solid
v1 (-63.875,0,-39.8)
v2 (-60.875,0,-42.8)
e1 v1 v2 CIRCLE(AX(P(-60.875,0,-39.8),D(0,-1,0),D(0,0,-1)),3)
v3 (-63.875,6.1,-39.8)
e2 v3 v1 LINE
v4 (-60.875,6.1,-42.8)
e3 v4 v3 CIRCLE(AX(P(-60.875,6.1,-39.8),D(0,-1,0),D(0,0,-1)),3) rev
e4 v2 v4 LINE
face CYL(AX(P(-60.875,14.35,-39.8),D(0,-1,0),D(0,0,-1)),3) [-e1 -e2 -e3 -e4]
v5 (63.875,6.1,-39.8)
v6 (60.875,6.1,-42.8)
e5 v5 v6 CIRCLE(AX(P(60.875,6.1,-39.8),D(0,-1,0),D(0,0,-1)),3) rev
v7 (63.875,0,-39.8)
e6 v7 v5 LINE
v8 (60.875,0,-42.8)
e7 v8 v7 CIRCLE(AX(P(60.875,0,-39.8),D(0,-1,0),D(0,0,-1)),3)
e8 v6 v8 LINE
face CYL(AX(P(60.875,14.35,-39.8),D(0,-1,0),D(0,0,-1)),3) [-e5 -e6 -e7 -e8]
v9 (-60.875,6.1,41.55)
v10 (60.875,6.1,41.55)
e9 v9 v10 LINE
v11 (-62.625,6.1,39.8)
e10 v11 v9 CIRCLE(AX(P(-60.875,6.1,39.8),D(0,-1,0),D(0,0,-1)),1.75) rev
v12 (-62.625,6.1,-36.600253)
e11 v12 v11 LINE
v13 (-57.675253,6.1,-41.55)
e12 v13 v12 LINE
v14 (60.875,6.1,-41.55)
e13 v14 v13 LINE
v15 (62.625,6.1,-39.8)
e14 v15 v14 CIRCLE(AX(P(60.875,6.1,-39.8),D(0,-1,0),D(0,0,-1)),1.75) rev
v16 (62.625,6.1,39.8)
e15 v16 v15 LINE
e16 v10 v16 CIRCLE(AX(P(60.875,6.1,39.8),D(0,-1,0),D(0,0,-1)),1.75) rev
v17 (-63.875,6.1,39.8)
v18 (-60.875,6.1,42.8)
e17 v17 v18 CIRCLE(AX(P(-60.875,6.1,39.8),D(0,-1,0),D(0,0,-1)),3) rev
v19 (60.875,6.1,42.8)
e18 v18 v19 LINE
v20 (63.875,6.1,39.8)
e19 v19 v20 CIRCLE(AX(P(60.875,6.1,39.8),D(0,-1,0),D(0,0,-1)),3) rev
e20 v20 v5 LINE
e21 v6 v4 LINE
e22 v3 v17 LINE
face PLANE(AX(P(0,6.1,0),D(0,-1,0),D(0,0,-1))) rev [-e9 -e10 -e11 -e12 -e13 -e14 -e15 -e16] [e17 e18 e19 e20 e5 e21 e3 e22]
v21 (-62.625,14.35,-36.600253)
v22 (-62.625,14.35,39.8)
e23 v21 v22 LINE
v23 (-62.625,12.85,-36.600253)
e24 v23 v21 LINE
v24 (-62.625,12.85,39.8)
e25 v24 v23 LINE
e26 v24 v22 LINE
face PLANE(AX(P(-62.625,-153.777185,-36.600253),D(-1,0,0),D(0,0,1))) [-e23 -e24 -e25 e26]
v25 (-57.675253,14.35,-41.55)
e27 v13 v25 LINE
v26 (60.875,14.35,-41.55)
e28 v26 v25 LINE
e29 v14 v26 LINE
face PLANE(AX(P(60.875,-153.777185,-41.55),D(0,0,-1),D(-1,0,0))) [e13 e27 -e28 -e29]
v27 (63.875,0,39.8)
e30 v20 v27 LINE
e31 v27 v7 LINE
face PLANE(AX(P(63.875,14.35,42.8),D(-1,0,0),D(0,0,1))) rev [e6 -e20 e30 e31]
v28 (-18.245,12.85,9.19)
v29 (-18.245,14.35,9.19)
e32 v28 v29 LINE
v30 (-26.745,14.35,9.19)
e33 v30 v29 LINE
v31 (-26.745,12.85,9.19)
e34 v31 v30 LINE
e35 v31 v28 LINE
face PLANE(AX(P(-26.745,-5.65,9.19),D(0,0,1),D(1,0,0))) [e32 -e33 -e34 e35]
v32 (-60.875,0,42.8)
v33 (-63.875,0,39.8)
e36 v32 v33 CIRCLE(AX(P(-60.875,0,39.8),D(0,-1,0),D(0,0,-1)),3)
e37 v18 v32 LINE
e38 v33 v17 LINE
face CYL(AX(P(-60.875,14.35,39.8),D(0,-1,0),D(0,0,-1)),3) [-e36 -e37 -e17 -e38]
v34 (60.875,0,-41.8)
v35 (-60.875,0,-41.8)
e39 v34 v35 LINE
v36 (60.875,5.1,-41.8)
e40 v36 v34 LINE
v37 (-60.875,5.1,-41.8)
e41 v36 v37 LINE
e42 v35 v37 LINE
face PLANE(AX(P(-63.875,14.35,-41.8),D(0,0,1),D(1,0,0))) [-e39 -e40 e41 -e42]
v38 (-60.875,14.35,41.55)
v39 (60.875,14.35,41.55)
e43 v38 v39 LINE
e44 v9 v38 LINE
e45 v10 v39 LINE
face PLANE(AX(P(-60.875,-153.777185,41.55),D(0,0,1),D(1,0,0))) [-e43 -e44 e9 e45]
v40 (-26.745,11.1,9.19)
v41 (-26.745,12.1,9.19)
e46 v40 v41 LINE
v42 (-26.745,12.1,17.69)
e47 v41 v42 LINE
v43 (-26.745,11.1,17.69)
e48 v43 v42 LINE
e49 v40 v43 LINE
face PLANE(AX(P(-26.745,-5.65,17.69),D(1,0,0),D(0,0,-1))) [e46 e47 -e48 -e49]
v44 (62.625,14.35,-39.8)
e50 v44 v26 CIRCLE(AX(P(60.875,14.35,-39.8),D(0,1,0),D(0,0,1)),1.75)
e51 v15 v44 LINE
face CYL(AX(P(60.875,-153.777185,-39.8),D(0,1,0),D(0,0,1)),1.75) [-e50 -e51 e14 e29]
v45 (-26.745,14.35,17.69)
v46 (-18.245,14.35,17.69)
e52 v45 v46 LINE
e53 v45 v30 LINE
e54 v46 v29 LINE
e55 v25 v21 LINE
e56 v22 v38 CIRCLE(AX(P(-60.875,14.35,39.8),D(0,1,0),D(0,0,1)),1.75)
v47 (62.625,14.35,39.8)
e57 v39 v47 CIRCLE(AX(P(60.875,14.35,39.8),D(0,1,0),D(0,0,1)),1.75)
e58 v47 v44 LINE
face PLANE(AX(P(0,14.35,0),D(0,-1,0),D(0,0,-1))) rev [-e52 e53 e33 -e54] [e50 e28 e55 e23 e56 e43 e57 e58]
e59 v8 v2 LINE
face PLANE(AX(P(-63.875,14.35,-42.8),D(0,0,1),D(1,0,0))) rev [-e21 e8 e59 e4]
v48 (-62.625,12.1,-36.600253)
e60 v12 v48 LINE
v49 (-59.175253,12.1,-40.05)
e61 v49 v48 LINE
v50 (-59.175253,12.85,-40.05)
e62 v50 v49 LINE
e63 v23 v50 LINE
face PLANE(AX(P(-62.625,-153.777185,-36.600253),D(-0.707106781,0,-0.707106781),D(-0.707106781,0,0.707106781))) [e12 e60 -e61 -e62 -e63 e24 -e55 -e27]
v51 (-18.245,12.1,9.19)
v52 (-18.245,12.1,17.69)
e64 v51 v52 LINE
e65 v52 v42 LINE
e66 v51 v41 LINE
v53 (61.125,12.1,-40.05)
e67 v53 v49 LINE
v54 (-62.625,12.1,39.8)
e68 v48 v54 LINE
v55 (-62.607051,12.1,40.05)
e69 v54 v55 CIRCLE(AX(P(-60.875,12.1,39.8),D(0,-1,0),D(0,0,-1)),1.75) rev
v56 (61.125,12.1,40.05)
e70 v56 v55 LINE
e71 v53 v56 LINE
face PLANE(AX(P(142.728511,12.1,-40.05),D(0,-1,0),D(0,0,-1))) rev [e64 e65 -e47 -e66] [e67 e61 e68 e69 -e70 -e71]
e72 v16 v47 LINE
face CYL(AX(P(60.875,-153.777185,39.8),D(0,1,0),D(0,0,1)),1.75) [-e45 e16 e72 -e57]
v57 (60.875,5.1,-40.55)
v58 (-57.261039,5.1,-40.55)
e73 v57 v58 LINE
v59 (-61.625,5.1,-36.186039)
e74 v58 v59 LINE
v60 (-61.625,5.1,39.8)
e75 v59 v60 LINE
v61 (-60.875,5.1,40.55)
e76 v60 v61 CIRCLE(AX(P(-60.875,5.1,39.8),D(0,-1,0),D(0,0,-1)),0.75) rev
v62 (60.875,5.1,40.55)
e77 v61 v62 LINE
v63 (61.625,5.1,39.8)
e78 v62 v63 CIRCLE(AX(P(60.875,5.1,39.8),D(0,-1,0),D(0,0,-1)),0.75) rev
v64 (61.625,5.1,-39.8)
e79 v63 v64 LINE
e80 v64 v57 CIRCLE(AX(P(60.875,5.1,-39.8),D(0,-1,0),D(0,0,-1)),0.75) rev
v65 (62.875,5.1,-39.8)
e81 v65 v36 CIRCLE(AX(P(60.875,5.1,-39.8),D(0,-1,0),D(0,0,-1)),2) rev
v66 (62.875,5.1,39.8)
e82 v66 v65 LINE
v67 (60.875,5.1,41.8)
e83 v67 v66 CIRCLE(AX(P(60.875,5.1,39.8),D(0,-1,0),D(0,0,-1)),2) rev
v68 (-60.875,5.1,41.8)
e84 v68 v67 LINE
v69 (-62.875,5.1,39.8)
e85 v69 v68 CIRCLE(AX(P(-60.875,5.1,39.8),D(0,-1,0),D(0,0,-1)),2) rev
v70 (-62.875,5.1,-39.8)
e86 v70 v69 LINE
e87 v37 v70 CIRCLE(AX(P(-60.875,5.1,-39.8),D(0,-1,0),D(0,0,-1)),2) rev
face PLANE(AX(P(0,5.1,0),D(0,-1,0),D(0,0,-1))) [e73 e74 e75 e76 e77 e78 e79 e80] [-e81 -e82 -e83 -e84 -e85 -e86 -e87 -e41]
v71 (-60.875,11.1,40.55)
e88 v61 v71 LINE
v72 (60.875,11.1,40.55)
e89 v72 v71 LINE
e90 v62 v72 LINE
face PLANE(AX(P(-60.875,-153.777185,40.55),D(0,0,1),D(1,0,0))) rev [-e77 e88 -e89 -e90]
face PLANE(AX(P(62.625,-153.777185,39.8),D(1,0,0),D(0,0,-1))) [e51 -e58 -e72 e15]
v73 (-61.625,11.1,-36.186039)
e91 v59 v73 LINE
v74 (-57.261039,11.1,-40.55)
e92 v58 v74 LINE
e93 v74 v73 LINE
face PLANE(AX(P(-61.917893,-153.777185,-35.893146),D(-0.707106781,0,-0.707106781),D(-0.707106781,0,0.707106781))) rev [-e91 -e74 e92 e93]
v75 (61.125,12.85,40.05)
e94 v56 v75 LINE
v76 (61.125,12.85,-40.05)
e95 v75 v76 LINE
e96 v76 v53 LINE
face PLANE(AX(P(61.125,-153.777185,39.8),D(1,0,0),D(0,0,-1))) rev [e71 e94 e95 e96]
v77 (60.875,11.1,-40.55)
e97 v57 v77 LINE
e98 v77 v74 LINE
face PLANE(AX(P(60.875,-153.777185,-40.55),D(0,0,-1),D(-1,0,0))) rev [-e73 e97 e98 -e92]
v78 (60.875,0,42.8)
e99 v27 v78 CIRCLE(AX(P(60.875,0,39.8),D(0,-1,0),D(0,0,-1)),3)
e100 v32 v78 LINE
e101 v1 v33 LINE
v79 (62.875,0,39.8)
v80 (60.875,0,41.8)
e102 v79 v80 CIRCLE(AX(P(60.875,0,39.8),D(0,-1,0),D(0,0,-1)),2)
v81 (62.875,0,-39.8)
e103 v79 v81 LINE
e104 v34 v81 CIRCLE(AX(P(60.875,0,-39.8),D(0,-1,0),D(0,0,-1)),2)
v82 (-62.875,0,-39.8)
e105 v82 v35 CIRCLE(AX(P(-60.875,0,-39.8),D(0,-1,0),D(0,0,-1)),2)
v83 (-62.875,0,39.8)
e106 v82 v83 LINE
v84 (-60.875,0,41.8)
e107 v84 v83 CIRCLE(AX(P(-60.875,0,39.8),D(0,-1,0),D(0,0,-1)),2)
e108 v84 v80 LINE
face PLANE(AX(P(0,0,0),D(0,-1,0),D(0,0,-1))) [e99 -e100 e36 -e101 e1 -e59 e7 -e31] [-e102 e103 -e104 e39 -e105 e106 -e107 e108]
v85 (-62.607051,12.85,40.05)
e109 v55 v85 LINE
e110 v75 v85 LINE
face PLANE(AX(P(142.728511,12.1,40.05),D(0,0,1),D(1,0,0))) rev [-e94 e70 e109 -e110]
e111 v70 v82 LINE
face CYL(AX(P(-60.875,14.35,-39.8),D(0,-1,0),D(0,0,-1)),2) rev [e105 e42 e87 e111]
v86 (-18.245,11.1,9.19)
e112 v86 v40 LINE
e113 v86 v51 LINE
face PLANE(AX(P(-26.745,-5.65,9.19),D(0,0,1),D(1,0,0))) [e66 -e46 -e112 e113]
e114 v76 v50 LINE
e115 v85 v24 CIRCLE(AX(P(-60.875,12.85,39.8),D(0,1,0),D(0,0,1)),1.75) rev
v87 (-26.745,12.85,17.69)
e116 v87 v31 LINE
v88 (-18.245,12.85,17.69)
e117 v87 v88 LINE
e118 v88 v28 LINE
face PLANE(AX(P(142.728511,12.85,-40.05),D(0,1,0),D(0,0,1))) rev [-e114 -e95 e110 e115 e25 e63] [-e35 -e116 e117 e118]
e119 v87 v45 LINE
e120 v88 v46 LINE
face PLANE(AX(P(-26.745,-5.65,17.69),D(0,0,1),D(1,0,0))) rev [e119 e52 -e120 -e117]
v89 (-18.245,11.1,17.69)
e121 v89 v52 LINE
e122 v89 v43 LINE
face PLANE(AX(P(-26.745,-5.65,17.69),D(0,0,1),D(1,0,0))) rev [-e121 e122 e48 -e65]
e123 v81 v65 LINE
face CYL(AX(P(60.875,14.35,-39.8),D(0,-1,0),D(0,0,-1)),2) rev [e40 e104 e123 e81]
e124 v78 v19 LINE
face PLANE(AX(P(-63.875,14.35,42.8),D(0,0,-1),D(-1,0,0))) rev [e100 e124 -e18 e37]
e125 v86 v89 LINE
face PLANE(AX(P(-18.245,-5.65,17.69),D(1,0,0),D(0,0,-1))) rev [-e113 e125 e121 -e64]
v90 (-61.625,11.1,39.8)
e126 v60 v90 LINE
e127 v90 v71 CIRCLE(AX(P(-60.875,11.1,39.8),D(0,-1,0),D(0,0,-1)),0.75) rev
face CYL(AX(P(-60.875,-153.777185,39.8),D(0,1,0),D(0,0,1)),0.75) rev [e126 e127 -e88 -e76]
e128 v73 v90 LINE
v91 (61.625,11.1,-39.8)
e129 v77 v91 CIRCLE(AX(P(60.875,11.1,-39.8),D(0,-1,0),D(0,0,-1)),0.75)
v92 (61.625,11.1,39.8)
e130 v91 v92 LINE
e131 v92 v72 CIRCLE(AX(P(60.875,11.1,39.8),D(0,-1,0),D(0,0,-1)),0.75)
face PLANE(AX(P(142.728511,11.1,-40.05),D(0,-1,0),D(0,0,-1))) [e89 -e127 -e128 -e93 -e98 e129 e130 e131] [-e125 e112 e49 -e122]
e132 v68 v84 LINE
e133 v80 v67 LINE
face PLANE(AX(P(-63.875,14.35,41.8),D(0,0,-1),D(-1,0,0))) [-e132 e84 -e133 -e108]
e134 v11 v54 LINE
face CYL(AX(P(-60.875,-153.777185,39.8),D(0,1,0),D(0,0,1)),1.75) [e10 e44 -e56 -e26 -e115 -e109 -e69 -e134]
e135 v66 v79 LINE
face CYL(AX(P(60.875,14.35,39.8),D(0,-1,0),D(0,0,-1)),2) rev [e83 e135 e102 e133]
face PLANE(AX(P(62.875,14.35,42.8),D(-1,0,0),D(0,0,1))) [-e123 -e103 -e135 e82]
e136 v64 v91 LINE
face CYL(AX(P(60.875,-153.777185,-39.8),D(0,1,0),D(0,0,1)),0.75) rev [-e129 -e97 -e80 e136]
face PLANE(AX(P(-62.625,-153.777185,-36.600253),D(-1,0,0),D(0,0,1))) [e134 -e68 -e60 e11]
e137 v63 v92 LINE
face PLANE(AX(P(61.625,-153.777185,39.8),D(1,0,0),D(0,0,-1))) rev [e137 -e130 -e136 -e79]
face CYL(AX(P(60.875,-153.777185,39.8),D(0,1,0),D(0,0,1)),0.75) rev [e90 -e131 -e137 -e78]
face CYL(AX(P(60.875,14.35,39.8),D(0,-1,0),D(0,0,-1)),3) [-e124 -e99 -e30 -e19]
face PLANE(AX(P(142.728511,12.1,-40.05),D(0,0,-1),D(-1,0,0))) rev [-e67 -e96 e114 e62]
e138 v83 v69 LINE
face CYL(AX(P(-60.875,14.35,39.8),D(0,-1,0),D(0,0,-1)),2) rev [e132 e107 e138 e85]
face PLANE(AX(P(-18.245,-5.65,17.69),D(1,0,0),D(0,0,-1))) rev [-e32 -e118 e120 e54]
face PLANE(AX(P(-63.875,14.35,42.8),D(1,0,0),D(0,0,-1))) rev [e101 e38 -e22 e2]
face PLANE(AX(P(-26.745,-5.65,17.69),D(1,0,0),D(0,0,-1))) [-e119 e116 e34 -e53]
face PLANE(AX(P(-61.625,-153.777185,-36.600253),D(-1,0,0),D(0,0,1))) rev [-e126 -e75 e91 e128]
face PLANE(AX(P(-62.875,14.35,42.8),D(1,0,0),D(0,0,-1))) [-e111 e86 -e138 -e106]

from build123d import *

# Parameters (mm, degrees)
SKETCH1_W           = 127.75
SKETCH1_H           = 85.6
BOSS_EXTRUDE1_DEPTH = 14.35
FILLET1_R           = 3
CUT_FLANGE_DEPTH    = 8.25
SKETCH5_W           = 80.1
SKETCH5_H           = 0.75
CUT_PAPERSLOT_DEPTH = 123.75
SHELL1_DEPTH        = 11.1
SHELL1_2_DEPTH      = 5.1
SKETCH4_W           = 8.5
SKETCH4_H           = 8.5
CUT_EXTRUDE3_DEPTH  = 20


# Read off the part's stored shape, not the designer's step: Shell1
with BuildPart() as part:
    # Sketch1 → Boss-Extrude1 (new body)
    with BuildSketch(Plane(origin=(0, 0, 0), x_dir=(1, 0, 0), z_dir=(0, 1, 0))):
        Rectangle(SKETCH1_W, SKETCH1_H)
    extrude(amount=BOSS_EXTRUDE1_DEPTH)

    # Fillet1
    fillet1_edges = [part.edges().sort_by_distance(p)[0] for p in [
        (-63.875, 7.175, -42.8),
        (63.875, 7.175, -42.8),
        (63.875, 7.175, 42.8),
        (-63.875, 7.175, 42.8),
    ]]
    fillet(fillet1_edges, radius=FILLET1_R)

    # Sketch3 → Cut-Flange (cut)
    with BuildSketch(Plane(origin=(0, 14.35, 0), x_dir=(1, 0, 0), z_dir=(0, 1, 0))):
        with BuildLine():
            Line((-63.875, 39.8), (-63.875, -39.8))
            ThreePointArc((-63.875, -39.8), (-62.996320344, -41.921320344), (-60.875, -42.8))
            Line((-60.875, -42.8), (60.875, -42.8))
            ThreePointArc((60.875, -42.8), (62.996320344, -41.921320344), (63.875, -39.8))
            Line((63.875, -39.8), (63.875, 39.8))
            ThreePointArc((63.875, 39.8), (62.996320344, 41.921320344), (60.875, 42.8))
            Line((60.875, 42.8), (-60.875, 42.8))
            ThreePointArc((-60.875, 42.8), (-62.996320344, 41.921320344), (-63.875, 39.8))
        make_face()
        with BuildLine():
            Line((-62.625, 36.600252532), (-62.625, -39.8))
            ThreePointArc((-62.625, -39.8), (-62.112436867, -41.037436867), (-60.875, -41.55))
            Line((-60.875, -41.55), (60.875, -41.55))
            ThreePointArc((60.875, -41.55), (62.112436867, -41.037436867), (62.625, -39.8))
            Line((62.625, -39.8), (62.625, 39.8))
            ThreePointArc((62.625, 39.8), (62.112436867, 41.037436867), (60.875, 41.55))
            Line((60.875, 41.55), (-57.675252532, 41.55))
            Line((-57.675252532, 41.55), (-62.625, 36.600252532))
        make_face(mode=Mode.SUBTRACT)
    extrude(amount=-CUT_FLANGE_DEPTH, mode=Mode.SUBTRACT)

    # Sketch5 → Cut-PaperSlot (cut)
    with BuildSketch(Plane.ZY.offset(62.625)):
        with Locations((0, 12.475)):
            Rectangle(SKETCH5_W, SKETCH5_H)
    extrude(amount=-CUT_PAPERSLOT_DEPTH, mode=Mode.SUBTRACT)

    # Shell1 outline → Shell1 (cut)
    with BuildSketch(Plane(origin=(0, 0, 0), x_dir=(1, 0, 0), z_dir=(0, 1, 0))):
        with BuildLine():
            Line((-61.625, 36.186038969), (-61.625, -39.8))
            ThreePointArc((-61.625, -39.8), (-61.405330086, -40.330330086), (-60.875, -40.55))
            Line((-60.875, -40.55), (60.875, -40.55))
            ThreePointArc((60.875, -40.55), (61.405330086, -40.330330086), (61.625, -39.8))
            Line((61.625, -39.8), (61.625, 39.8))
            ThreePointArc((61.625, 39.8), (61.405330086, 40.330330086), (60.875, 40.55))
            Line((60.875, 40.55), (-57.261038969, 40.55))
            Line((-57.261038969, 40.55), (-61.625, 36.186038969))
        make_face()
    extrude(amount=SHELL1_DEPTH, mode=Mode.SUBTRACT)

    # Shell1 2 outline → Shell1 2 (cut)
    with BuildSketch(Plane(origin=(0, 0, 0), x_dir=(1, 0, 0), z_dir=(0, 1, 0))):
        with BuildLine():
            Line((-62.875, 39.8), (-62.875, -39.8))
            ThreePointArc((-62.875, -39.8), (-62.289213562, -41.214213562), (-60.875, -41.8))
            Line((-60.875, -41.8), (60.875, -41.8))
            ThreePointArc((60.875, -41.8), (62.289213562, -41.214213562), (62.875, -39.8))
            Line((62.875, -39.8), (62.875, 39.8))
            ThreePointArc((62.875, 39.8), (62.289213562, 41.214213562), (60.875, 41.8))
            Line((60.875, 41.8), (-60.875, 41.8))
            ThreePointArc((-60.875, 41.8), (-62.289213562, 41.214213562), (-62.875, 39.8))
        make_face()
        with BuildLine():
            ThreePointArc((-60.875, -40.55), (-61.405330086, -40.330330086), (-61.625, -39.8))
            Line((-61.625, -39.8), (-61.625, 36.186038969))
            Line((-61.625, 36.186038969), (-57.261038969, 40.55))
            Line((-57.261038969, 40.55), (60.875, 40.55))
            ThreePointArc((60.875, 40.55), (61.405330086, 40.330330086), (61.625, 39.8))
            Line((61.625, 39.8), (61.625, -39.8))
            ThreePointArc((61.625, -39.8), (61.405330086, -40.330330086), (60.875, -40.55))
            Line((60.875, -40.55), (-60.875, -40.55))
        make_face(mode=Mode.SUBTRACT)
    extrude(amount=SHELL1_2_DEPTH, mode=Mode.SUBTRACT)

    # Sketch4 → Cut-Extrude3 (cut)
    with BuildSketch(Plane(origin=(0, 14.35, 0), x_dir=(1, 0, 0), z_dir=(0, 1, 0))):
        with Locations((-22.495, -13.44)):
            Rectangle(SKETCH4_W, SKETCH4_H)
    extrude(amount=-CUT_EXTRUDE3_DEPTH, mode=Mode.SUBTRACT)


solid = part.part
